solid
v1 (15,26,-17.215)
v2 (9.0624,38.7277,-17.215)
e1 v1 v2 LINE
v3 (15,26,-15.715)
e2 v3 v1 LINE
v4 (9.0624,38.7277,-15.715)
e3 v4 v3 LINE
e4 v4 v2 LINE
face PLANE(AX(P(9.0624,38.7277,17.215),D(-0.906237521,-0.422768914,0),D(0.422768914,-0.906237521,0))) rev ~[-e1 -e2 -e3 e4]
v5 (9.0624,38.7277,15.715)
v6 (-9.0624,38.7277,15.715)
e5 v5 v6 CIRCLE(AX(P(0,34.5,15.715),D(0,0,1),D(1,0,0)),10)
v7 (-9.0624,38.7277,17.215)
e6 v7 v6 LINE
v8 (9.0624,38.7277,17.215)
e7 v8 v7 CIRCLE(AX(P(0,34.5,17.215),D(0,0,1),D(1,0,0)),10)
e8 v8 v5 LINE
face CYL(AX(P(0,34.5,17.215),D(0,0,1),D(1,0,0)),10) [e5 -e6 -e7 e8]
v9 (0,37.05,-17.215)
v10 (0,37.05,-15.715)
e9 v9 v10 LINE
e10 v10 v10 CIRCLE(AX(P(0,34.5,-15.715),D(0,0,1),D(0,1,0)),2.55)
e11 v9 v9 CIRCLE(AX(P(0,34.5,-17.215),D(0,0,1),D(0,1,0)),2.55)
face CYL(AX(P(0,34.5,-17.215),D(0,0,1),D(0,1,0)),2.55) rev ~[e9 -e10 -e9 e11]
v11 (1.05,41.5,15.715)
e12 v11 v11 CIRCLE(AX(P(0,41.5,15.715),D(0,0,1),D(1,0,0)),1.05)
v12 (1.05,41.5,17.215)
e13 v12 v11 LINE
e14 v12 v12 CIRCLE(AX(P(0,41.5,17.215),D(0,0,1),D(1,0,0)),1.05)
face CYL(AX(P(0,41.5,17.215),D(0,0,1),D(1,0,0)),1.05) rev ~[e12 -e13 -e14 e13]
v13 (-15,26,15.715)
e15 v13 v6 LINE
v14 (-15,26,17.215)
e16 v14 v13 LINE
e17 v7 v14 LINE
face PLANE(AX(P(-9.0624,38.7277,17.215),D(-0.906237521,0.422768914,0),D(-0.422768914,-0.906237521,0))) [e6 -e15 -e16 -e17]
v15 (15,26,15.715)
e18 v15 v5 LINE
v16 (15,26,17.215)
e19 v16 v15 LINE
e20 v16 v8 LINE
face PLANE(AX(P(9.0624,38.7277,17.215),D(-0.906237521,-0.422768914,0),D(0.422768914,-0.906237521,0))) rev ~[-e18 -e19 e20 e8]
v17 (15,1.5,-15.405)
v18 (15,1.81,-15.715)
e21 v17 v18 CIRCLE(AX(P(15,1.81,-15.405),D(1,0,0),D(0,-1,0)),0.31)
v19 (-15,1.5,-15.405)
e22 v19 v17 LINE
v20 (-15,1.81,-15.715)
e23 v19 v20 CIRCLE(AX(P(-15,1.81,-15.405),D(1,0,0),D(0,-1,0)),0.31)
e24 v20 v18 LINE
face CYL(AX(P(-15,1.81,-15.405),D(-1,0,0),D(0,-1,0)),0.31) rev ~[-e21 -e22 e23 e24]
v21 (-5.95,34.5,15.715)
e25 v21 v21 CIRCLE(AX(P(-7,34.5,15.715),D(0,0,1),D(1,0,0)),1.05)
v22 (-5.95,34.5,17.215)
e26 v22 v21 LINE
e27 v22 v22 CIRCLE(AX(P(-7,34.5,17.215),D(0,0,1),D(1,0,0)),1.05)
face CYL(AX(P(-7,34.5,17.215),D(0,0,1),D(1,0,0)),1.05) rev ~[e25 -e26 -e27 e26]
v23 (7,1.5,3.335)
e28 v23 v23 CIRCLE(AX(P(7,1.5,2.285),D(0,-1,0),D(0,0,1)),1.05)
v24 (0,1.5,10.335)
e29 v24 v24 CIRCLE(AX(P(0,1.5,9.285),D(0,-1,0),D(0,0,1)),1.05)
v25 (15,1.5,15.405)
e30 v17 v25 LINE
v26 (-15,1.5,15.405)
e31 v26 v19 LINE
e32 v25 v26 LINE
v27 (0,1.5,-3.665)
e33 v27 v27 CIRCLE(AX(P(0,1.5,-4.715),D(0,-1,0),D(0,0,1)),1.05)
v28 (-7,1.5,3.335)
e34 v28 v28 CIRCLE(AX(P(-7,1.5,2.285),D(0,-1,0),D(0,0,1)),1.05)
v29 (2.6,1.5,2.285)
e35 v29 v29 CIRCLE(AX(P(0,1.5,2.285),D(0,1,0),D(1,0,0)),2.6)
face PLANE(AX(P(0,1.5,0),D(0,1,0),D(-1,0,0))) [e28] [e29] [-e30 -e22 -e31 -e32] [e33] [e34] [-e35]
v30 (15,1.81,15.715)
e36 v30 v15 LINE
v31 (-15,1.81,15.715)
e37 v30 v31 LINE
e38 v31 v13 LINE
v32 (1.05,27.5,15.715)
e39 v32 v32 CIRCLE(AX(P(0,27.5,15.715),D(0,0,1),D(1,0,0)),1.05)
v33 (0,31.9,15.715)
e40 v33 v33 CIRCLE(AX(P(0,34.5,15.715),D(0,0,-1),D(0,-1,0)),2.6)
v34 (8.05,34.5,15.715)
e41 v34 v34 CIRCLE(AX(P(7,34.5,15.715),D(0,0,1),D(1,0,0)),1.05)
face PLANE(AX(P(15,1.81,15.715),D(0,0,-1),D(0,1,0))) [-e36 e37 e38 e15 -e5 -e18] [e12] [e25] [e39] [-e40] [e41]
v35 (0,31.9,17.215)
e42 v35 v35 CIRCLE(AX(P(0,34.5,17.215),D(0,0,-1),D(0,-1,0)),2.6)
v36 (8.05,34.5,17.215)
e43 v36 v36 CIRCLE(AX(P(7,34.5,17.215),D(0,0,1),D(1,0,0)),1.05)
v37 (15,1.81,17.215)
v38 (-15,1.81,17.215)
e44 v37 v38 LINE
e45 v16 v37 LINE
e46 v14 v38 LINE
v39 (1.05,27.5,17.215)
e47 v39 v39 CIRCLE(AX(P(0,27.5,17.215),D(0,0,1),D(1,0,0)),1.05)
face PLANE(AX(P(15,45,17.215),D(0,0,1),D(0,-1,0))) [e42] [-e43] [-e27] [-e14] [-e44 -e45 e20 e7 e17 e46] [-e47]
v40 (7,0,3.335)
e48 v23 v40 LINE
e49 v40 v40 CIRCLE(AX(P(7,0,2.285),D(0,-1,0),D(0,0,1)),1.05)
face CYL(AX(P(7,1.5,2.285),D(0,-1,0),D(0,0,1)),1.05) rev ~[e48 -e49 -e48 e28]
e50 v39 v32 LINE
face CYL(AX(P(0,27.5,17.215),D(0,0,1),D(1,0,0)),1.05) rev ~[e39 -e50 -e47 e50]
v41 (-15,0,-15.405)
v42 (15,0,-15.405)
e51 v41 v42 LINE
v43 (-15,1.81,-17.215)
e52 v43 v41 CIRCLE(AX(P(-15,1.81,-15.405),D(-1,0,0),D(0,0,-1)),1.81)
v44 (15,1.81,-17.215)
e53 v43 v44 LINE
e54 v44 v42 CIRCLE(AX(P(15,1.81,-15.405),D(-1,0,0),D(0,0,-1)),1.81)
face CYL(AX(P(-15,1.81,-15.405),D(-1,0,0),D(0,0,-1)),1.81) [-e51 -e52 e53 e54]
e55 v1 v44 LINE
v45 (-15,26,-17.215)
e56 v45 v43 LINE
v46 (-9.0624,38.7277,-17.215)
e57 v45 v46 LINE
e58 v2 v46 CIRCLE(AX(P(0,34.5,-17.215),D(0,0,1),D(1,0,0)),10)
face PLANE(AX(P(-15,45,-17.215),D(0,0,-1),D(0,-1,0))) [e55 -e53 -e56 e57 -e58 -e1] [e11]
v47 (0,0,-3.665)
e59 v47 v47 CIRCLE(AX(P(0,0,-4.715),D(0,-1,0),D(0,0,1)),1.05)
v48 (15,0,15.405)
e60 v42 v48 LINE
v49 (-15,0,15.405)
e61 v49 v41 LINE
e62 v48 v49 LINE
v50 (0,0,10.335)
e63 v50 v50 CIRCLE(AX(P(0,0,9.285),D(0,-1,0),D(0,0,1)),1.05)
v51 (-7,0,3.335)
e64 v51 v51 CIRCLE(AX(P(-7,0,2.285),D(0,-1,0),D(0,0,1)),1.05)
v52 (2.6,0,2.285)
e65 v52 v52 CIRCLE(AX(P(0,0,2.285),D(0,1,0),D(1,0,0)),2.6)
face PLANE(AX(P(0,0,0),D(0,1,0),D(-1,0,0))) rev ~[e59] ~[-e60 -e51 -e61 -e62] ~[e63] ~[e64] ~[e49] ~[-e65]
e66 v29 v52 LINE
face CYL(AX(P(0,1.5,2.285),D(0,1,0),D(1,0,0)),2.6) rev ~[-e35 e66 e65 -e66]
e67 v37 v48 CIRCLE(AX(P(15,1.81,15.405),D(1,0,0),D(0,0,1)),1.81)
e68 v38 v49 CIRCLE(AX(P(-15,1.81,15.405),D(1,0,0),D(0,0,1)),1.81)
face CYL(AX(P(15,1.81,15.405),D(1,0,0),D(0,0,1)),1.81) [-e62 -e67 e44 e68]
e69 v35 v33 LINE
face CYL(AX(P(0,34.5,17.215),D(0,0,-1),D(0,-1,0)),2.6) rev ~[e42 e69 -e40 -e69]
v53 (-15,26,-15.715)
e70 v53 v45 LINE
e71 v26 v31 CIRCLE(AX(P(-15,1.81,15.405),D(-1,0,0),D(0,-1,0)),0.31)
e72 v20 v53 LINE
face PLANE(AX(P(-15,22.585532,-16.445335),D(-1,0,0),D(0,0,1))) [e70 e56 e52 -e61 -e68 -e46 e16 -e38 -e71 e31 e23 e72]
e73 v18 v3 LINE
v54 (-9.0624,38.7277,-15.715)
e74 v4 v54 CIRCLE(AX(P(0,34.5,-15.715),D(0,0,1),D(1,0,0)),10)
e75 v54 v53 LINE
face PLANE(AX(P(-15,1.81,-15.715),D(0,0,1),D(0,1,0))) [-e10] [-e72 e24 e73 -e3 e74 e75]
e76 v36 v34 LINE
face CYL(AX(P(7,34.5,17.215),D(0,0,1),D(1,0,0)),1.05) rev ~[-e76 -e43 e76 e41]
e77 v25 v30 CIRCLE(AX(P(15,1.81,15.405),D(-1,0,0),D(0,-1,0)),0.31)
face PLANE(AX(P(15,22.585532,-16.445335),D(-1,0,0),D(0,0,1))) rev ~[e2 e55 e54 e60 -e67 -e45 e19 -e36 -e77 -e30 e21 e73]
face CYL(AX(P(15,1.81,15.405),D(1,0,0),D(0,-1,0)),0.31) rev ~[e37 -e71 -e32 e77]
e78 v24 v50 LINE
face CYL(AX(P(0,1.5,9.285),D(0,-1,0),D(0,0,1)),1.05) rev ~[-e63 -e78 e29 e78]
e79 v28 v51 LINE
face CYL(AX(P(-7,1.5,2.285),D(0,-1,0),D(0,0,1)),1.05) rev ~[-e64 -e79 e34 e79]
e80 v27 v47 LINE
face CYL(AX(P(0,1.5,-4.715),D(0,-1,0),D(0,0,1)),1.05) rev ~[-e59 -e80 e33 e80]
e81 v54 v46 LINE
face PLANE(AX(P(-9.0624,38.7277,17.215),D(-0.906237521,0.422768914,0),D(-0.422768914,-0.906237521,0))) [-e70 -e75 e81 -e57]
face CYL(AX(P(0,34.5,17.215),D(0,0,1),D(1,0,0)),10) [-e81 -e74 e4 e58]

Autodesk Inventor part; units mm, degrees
ref_plane "YZ Plane" through (0, 0, 0) normal (1, 0, 0) x (0, 1, 0)
ref_plane "XZ Plane" through (0, 0, 0) normal (0, 1, 0) x (-1, 0, 0)
ref_plane "XY Plane" through (0, 0, 0) normal (0, 0, 1) x (1, 0, 0)
sketch "Sketch1" plane through (0, 0, 0) normal (0, 1, 0) x (-1, 0, 0)
  line L0 (15, -15.715) -> (-15, -15.715)
  line L1 (-15, -15.715) -> (-15, 15.715)
  line L2 (-15, 15.715) -> (15, 15.715)
  line L3 (15, 15.715) -> (15, -15.715)
  point P0 (0, 0)
  dimension "d0" = 30
  dimension "d1" = 31.43
  dimension "d2" = 15
  dimension "d3" = 15.715
extrude "Plate1" add sketch "Sketch1" along normal blind 1.5
sketch "Sketch2" plane through (15, 0, 17.215) normal (0, 0, -1) x (-1, 0, 0)
  line L0 (30, 0) -> (0, 0)
  line L1 (0, 0) -> (0, 45)
  line L2 (0, 45) -> (30, 45)
  line L3 (30, 45) -> (30, 0)
edge flange "Flange1" height 45 angle 90 thickness 1.5 bend radius 0.31 thickness toward (0, 0, -1) relief tear relief width 1.5 relief depth 0.75 edges at (0, 1.5, 15.715) wall of the first edge with corners at (-15, 0, 17.215) (15, 0, 17.215) (15, 45, 17.215) (-15, 45, 17.215)
bend "Bend1"
corner "Corner1"
sketch "Sketch3" plane through (-15, 0, -17.215) normal (0, 0, 1) x (1, 0, 0)
  line L0 (30, 0) -> (0, 0)
  line L1 (0, 0) -> (0, 45)
  line L2 (0, 45) -> (30, 45)
  line L3 (30, 45) -> (30, 0)
edge flange "Flange2" height 45 angle 90 thickness 1.5 bend radius 0.31 thickness toward (0, 0, 1) relief tear relief width 1.5 relief depth 0.75 edges at (0, 1.5, -15.715) wall of the first edge with corners at (15, 0, -17.215) (-15, 0, -17.215) (-15, 45, -17.215) (15, 45, -17.215)
bend "Bend2"
corner "Corner2"
sketch "Sketch6" plane through (-15, 45, 17.215) normal (0, 0, 1) x (1, 0, 0)
  circle A0 centre (15, -10.5) radius 10
  line L0 (5, -10.5) -> (5, 9.5)
  line L1 (5, 9.5) -> (25, 9.5)
  line L2 (25, 9.5) -> (25, -10.5)
  line L3 (0, 0) -> (30, 0) projected
  line L4 (0, -43.19) -> (0, 0) projected
  line L5 (5.9376, -6.2723) -> (0, -19)
  line L6 (24.0624, -6.2723) -> (30, -19)
  line L7 (30, -45) -> (0, -45) projected
  line L8 (30, 0) -> (30, -43.19) projected
  point P0 (15, -45)
  point P1 (25, 0)
  point P2 (5, -8.2822)
  point P3 (5, 0)
  point P4 (30, -19)
  point P5 (25, -8.2822)
  dimension "d39" = 34.5
  dimension "d40" = 20
  dimension "d41" = 20
  dimension "d42" = 20
  dimension "d43" = 20
  dimension "d45" = 15
  dimension "d48" = 26
  dimension "d49" = 26
  dimension "d50" = 0
extrude "Extrusion1" cut sketch "Sketch6" against normal blind 50 contours A0 L5 L0 L3 L2 L6 | L2 L3 L8 L6 | L5 L4 L3 L0
sketch "Sketch7" plane through (-15, 1.81, 17.215) normal (0, 0, 1) x (1, 0, 0)
  arc A0 (24.0624, 36.9177) -> (5.9376, 36.9177) centre (15, 32.69) ccw projected
  circle A1 centre (22, 32.69) radius 1.05
  circle A2 centre (15, 39.69) radius 1.05
  circle A3 centre (8, 32.69) radius 1.05
  circle A4 centre (15, 25.69) radius 1.05
  point P0 (15, -1.81)
  dimension "d51" = 7
  dimension "d52" = 2.1
  dimension "d55" = 360
extrude "Extrusion2" cut sketch "Sketch7" against normal blind 20
sketch "Sketch8" plane through (0, 1.5, 0) normal (0, 1, 0) x (1, 0, 0)
  line L0 (15, 15.715) -> (9.0624, 15.715) projected
  line L1 (9.0624, 15.715) -> (-9.0624, 15.715) projected
  line L2 (-9.0624, 15.715) -> (-15, 15.715) projected
  line L3 (-15, 15.715) -> (15, 15.715) projected
  circle A0 centre (0, -2.285) radius 2.6
  point P0 (0, 0)
  point P1 (7, -2.285)
  point P2 (0, 4.715)
  point P3 (-7, -2.285)
  point P4 (0, -9.285)
  dimension "d59" = 18
  dimension "d60" = 0
  dimension "d61" = 5.2
  dimension "d62" = 7
  dimension "d63" = 0
  dimension "d66" = 360
extrude "Extrusion3" cut sketch "Sketch8" against normal blind 10
sketch "Sketch9" plane through (0, 1.5, 0) normal (0, 1, 0) x (1, 0, 0)
  point P0 (0, 0)
hole "Hole3" at (0, 1.5, -4.715) at (7, 1.5, 2.285) at (-7, 1.5, 2.285) at (0, 1.5, 9.285) direction (0, -1, 0) diameter 2.1 depth 1.5
hole "Hole4" at (0, 34.5, 17.215) direction (0, 0, -1) diameter 5.2 depth 1.5 clearance for "Hex Head Bolt" size "M5" standard "Ansi Metric M Profile"
sketch "Sketch10" plane through (15, 1.81, -17.215) normal (0, 0, -1) x (-1, 0, 0)
  circle A0 centre (15, 32.69) radius 2.6 projected
  point P0 (15, -1.81)
hole "Hole5" at (0, 34.5, -17.215) direction (0, 0, 1) diameter 5.1 depth 1.5 clearance for "Hex Head Bolt" size "M5" standard "Ansi Metric M Profile"
equation "\"d75\" = Thickness"
equation "\"d82\" = Thickness"
equation "\"d89\" = Thickness"
equation "\"d4\" = Thickness"
equation "\"d5\" = BendReliefWidth"
equation "\"d6\" = BendReliefDepth"
equation "\"d7\" = MinimumRemnant"
equation "\"d8\" = TransitionRadius"
equation "\"d11\" = BendRadius"
equation "\"d12\" = CornerReliefSize"
equation "\"d13\" = GapSize"
equation "\"d14\" = JacobiRadiusSize"
equation "\"d15\" = BendReliefWidth"
equation "\"d16\" = BendReliefDepth"
equation "\"d17\" = MinimumRemnant"
equation "\"d18\" = TransitionRadius"
equation "\"d21\" = BendRadius"
equation "\"d22\" = CornerReliefSize"
equation "\"d23\" = GapSize"
equation "\"d24\" = JacobiRadiusSize"
equation "\"BendReliefWidth\" = Thickness"
equation "\"BendReliefDepth\" = 0.5 * Thickness"
equation "\"CornerReliefSize\" = 4 * Thickness"
equation "\"MinimumRemnant\" = 2 * Thickness"
equation "\"TransitionRadius\" = BendRadius"
equation "\"JacobiRadiusSize\" = BendRadius"
equation "\"GapSize\" = Thickness"
equation "\"Thickness\" = 1.5"
equation "\"BendRadius\" = 0.31"
properties part number "axis_7_top_frame" material "Aluminum 6061-AHC"
